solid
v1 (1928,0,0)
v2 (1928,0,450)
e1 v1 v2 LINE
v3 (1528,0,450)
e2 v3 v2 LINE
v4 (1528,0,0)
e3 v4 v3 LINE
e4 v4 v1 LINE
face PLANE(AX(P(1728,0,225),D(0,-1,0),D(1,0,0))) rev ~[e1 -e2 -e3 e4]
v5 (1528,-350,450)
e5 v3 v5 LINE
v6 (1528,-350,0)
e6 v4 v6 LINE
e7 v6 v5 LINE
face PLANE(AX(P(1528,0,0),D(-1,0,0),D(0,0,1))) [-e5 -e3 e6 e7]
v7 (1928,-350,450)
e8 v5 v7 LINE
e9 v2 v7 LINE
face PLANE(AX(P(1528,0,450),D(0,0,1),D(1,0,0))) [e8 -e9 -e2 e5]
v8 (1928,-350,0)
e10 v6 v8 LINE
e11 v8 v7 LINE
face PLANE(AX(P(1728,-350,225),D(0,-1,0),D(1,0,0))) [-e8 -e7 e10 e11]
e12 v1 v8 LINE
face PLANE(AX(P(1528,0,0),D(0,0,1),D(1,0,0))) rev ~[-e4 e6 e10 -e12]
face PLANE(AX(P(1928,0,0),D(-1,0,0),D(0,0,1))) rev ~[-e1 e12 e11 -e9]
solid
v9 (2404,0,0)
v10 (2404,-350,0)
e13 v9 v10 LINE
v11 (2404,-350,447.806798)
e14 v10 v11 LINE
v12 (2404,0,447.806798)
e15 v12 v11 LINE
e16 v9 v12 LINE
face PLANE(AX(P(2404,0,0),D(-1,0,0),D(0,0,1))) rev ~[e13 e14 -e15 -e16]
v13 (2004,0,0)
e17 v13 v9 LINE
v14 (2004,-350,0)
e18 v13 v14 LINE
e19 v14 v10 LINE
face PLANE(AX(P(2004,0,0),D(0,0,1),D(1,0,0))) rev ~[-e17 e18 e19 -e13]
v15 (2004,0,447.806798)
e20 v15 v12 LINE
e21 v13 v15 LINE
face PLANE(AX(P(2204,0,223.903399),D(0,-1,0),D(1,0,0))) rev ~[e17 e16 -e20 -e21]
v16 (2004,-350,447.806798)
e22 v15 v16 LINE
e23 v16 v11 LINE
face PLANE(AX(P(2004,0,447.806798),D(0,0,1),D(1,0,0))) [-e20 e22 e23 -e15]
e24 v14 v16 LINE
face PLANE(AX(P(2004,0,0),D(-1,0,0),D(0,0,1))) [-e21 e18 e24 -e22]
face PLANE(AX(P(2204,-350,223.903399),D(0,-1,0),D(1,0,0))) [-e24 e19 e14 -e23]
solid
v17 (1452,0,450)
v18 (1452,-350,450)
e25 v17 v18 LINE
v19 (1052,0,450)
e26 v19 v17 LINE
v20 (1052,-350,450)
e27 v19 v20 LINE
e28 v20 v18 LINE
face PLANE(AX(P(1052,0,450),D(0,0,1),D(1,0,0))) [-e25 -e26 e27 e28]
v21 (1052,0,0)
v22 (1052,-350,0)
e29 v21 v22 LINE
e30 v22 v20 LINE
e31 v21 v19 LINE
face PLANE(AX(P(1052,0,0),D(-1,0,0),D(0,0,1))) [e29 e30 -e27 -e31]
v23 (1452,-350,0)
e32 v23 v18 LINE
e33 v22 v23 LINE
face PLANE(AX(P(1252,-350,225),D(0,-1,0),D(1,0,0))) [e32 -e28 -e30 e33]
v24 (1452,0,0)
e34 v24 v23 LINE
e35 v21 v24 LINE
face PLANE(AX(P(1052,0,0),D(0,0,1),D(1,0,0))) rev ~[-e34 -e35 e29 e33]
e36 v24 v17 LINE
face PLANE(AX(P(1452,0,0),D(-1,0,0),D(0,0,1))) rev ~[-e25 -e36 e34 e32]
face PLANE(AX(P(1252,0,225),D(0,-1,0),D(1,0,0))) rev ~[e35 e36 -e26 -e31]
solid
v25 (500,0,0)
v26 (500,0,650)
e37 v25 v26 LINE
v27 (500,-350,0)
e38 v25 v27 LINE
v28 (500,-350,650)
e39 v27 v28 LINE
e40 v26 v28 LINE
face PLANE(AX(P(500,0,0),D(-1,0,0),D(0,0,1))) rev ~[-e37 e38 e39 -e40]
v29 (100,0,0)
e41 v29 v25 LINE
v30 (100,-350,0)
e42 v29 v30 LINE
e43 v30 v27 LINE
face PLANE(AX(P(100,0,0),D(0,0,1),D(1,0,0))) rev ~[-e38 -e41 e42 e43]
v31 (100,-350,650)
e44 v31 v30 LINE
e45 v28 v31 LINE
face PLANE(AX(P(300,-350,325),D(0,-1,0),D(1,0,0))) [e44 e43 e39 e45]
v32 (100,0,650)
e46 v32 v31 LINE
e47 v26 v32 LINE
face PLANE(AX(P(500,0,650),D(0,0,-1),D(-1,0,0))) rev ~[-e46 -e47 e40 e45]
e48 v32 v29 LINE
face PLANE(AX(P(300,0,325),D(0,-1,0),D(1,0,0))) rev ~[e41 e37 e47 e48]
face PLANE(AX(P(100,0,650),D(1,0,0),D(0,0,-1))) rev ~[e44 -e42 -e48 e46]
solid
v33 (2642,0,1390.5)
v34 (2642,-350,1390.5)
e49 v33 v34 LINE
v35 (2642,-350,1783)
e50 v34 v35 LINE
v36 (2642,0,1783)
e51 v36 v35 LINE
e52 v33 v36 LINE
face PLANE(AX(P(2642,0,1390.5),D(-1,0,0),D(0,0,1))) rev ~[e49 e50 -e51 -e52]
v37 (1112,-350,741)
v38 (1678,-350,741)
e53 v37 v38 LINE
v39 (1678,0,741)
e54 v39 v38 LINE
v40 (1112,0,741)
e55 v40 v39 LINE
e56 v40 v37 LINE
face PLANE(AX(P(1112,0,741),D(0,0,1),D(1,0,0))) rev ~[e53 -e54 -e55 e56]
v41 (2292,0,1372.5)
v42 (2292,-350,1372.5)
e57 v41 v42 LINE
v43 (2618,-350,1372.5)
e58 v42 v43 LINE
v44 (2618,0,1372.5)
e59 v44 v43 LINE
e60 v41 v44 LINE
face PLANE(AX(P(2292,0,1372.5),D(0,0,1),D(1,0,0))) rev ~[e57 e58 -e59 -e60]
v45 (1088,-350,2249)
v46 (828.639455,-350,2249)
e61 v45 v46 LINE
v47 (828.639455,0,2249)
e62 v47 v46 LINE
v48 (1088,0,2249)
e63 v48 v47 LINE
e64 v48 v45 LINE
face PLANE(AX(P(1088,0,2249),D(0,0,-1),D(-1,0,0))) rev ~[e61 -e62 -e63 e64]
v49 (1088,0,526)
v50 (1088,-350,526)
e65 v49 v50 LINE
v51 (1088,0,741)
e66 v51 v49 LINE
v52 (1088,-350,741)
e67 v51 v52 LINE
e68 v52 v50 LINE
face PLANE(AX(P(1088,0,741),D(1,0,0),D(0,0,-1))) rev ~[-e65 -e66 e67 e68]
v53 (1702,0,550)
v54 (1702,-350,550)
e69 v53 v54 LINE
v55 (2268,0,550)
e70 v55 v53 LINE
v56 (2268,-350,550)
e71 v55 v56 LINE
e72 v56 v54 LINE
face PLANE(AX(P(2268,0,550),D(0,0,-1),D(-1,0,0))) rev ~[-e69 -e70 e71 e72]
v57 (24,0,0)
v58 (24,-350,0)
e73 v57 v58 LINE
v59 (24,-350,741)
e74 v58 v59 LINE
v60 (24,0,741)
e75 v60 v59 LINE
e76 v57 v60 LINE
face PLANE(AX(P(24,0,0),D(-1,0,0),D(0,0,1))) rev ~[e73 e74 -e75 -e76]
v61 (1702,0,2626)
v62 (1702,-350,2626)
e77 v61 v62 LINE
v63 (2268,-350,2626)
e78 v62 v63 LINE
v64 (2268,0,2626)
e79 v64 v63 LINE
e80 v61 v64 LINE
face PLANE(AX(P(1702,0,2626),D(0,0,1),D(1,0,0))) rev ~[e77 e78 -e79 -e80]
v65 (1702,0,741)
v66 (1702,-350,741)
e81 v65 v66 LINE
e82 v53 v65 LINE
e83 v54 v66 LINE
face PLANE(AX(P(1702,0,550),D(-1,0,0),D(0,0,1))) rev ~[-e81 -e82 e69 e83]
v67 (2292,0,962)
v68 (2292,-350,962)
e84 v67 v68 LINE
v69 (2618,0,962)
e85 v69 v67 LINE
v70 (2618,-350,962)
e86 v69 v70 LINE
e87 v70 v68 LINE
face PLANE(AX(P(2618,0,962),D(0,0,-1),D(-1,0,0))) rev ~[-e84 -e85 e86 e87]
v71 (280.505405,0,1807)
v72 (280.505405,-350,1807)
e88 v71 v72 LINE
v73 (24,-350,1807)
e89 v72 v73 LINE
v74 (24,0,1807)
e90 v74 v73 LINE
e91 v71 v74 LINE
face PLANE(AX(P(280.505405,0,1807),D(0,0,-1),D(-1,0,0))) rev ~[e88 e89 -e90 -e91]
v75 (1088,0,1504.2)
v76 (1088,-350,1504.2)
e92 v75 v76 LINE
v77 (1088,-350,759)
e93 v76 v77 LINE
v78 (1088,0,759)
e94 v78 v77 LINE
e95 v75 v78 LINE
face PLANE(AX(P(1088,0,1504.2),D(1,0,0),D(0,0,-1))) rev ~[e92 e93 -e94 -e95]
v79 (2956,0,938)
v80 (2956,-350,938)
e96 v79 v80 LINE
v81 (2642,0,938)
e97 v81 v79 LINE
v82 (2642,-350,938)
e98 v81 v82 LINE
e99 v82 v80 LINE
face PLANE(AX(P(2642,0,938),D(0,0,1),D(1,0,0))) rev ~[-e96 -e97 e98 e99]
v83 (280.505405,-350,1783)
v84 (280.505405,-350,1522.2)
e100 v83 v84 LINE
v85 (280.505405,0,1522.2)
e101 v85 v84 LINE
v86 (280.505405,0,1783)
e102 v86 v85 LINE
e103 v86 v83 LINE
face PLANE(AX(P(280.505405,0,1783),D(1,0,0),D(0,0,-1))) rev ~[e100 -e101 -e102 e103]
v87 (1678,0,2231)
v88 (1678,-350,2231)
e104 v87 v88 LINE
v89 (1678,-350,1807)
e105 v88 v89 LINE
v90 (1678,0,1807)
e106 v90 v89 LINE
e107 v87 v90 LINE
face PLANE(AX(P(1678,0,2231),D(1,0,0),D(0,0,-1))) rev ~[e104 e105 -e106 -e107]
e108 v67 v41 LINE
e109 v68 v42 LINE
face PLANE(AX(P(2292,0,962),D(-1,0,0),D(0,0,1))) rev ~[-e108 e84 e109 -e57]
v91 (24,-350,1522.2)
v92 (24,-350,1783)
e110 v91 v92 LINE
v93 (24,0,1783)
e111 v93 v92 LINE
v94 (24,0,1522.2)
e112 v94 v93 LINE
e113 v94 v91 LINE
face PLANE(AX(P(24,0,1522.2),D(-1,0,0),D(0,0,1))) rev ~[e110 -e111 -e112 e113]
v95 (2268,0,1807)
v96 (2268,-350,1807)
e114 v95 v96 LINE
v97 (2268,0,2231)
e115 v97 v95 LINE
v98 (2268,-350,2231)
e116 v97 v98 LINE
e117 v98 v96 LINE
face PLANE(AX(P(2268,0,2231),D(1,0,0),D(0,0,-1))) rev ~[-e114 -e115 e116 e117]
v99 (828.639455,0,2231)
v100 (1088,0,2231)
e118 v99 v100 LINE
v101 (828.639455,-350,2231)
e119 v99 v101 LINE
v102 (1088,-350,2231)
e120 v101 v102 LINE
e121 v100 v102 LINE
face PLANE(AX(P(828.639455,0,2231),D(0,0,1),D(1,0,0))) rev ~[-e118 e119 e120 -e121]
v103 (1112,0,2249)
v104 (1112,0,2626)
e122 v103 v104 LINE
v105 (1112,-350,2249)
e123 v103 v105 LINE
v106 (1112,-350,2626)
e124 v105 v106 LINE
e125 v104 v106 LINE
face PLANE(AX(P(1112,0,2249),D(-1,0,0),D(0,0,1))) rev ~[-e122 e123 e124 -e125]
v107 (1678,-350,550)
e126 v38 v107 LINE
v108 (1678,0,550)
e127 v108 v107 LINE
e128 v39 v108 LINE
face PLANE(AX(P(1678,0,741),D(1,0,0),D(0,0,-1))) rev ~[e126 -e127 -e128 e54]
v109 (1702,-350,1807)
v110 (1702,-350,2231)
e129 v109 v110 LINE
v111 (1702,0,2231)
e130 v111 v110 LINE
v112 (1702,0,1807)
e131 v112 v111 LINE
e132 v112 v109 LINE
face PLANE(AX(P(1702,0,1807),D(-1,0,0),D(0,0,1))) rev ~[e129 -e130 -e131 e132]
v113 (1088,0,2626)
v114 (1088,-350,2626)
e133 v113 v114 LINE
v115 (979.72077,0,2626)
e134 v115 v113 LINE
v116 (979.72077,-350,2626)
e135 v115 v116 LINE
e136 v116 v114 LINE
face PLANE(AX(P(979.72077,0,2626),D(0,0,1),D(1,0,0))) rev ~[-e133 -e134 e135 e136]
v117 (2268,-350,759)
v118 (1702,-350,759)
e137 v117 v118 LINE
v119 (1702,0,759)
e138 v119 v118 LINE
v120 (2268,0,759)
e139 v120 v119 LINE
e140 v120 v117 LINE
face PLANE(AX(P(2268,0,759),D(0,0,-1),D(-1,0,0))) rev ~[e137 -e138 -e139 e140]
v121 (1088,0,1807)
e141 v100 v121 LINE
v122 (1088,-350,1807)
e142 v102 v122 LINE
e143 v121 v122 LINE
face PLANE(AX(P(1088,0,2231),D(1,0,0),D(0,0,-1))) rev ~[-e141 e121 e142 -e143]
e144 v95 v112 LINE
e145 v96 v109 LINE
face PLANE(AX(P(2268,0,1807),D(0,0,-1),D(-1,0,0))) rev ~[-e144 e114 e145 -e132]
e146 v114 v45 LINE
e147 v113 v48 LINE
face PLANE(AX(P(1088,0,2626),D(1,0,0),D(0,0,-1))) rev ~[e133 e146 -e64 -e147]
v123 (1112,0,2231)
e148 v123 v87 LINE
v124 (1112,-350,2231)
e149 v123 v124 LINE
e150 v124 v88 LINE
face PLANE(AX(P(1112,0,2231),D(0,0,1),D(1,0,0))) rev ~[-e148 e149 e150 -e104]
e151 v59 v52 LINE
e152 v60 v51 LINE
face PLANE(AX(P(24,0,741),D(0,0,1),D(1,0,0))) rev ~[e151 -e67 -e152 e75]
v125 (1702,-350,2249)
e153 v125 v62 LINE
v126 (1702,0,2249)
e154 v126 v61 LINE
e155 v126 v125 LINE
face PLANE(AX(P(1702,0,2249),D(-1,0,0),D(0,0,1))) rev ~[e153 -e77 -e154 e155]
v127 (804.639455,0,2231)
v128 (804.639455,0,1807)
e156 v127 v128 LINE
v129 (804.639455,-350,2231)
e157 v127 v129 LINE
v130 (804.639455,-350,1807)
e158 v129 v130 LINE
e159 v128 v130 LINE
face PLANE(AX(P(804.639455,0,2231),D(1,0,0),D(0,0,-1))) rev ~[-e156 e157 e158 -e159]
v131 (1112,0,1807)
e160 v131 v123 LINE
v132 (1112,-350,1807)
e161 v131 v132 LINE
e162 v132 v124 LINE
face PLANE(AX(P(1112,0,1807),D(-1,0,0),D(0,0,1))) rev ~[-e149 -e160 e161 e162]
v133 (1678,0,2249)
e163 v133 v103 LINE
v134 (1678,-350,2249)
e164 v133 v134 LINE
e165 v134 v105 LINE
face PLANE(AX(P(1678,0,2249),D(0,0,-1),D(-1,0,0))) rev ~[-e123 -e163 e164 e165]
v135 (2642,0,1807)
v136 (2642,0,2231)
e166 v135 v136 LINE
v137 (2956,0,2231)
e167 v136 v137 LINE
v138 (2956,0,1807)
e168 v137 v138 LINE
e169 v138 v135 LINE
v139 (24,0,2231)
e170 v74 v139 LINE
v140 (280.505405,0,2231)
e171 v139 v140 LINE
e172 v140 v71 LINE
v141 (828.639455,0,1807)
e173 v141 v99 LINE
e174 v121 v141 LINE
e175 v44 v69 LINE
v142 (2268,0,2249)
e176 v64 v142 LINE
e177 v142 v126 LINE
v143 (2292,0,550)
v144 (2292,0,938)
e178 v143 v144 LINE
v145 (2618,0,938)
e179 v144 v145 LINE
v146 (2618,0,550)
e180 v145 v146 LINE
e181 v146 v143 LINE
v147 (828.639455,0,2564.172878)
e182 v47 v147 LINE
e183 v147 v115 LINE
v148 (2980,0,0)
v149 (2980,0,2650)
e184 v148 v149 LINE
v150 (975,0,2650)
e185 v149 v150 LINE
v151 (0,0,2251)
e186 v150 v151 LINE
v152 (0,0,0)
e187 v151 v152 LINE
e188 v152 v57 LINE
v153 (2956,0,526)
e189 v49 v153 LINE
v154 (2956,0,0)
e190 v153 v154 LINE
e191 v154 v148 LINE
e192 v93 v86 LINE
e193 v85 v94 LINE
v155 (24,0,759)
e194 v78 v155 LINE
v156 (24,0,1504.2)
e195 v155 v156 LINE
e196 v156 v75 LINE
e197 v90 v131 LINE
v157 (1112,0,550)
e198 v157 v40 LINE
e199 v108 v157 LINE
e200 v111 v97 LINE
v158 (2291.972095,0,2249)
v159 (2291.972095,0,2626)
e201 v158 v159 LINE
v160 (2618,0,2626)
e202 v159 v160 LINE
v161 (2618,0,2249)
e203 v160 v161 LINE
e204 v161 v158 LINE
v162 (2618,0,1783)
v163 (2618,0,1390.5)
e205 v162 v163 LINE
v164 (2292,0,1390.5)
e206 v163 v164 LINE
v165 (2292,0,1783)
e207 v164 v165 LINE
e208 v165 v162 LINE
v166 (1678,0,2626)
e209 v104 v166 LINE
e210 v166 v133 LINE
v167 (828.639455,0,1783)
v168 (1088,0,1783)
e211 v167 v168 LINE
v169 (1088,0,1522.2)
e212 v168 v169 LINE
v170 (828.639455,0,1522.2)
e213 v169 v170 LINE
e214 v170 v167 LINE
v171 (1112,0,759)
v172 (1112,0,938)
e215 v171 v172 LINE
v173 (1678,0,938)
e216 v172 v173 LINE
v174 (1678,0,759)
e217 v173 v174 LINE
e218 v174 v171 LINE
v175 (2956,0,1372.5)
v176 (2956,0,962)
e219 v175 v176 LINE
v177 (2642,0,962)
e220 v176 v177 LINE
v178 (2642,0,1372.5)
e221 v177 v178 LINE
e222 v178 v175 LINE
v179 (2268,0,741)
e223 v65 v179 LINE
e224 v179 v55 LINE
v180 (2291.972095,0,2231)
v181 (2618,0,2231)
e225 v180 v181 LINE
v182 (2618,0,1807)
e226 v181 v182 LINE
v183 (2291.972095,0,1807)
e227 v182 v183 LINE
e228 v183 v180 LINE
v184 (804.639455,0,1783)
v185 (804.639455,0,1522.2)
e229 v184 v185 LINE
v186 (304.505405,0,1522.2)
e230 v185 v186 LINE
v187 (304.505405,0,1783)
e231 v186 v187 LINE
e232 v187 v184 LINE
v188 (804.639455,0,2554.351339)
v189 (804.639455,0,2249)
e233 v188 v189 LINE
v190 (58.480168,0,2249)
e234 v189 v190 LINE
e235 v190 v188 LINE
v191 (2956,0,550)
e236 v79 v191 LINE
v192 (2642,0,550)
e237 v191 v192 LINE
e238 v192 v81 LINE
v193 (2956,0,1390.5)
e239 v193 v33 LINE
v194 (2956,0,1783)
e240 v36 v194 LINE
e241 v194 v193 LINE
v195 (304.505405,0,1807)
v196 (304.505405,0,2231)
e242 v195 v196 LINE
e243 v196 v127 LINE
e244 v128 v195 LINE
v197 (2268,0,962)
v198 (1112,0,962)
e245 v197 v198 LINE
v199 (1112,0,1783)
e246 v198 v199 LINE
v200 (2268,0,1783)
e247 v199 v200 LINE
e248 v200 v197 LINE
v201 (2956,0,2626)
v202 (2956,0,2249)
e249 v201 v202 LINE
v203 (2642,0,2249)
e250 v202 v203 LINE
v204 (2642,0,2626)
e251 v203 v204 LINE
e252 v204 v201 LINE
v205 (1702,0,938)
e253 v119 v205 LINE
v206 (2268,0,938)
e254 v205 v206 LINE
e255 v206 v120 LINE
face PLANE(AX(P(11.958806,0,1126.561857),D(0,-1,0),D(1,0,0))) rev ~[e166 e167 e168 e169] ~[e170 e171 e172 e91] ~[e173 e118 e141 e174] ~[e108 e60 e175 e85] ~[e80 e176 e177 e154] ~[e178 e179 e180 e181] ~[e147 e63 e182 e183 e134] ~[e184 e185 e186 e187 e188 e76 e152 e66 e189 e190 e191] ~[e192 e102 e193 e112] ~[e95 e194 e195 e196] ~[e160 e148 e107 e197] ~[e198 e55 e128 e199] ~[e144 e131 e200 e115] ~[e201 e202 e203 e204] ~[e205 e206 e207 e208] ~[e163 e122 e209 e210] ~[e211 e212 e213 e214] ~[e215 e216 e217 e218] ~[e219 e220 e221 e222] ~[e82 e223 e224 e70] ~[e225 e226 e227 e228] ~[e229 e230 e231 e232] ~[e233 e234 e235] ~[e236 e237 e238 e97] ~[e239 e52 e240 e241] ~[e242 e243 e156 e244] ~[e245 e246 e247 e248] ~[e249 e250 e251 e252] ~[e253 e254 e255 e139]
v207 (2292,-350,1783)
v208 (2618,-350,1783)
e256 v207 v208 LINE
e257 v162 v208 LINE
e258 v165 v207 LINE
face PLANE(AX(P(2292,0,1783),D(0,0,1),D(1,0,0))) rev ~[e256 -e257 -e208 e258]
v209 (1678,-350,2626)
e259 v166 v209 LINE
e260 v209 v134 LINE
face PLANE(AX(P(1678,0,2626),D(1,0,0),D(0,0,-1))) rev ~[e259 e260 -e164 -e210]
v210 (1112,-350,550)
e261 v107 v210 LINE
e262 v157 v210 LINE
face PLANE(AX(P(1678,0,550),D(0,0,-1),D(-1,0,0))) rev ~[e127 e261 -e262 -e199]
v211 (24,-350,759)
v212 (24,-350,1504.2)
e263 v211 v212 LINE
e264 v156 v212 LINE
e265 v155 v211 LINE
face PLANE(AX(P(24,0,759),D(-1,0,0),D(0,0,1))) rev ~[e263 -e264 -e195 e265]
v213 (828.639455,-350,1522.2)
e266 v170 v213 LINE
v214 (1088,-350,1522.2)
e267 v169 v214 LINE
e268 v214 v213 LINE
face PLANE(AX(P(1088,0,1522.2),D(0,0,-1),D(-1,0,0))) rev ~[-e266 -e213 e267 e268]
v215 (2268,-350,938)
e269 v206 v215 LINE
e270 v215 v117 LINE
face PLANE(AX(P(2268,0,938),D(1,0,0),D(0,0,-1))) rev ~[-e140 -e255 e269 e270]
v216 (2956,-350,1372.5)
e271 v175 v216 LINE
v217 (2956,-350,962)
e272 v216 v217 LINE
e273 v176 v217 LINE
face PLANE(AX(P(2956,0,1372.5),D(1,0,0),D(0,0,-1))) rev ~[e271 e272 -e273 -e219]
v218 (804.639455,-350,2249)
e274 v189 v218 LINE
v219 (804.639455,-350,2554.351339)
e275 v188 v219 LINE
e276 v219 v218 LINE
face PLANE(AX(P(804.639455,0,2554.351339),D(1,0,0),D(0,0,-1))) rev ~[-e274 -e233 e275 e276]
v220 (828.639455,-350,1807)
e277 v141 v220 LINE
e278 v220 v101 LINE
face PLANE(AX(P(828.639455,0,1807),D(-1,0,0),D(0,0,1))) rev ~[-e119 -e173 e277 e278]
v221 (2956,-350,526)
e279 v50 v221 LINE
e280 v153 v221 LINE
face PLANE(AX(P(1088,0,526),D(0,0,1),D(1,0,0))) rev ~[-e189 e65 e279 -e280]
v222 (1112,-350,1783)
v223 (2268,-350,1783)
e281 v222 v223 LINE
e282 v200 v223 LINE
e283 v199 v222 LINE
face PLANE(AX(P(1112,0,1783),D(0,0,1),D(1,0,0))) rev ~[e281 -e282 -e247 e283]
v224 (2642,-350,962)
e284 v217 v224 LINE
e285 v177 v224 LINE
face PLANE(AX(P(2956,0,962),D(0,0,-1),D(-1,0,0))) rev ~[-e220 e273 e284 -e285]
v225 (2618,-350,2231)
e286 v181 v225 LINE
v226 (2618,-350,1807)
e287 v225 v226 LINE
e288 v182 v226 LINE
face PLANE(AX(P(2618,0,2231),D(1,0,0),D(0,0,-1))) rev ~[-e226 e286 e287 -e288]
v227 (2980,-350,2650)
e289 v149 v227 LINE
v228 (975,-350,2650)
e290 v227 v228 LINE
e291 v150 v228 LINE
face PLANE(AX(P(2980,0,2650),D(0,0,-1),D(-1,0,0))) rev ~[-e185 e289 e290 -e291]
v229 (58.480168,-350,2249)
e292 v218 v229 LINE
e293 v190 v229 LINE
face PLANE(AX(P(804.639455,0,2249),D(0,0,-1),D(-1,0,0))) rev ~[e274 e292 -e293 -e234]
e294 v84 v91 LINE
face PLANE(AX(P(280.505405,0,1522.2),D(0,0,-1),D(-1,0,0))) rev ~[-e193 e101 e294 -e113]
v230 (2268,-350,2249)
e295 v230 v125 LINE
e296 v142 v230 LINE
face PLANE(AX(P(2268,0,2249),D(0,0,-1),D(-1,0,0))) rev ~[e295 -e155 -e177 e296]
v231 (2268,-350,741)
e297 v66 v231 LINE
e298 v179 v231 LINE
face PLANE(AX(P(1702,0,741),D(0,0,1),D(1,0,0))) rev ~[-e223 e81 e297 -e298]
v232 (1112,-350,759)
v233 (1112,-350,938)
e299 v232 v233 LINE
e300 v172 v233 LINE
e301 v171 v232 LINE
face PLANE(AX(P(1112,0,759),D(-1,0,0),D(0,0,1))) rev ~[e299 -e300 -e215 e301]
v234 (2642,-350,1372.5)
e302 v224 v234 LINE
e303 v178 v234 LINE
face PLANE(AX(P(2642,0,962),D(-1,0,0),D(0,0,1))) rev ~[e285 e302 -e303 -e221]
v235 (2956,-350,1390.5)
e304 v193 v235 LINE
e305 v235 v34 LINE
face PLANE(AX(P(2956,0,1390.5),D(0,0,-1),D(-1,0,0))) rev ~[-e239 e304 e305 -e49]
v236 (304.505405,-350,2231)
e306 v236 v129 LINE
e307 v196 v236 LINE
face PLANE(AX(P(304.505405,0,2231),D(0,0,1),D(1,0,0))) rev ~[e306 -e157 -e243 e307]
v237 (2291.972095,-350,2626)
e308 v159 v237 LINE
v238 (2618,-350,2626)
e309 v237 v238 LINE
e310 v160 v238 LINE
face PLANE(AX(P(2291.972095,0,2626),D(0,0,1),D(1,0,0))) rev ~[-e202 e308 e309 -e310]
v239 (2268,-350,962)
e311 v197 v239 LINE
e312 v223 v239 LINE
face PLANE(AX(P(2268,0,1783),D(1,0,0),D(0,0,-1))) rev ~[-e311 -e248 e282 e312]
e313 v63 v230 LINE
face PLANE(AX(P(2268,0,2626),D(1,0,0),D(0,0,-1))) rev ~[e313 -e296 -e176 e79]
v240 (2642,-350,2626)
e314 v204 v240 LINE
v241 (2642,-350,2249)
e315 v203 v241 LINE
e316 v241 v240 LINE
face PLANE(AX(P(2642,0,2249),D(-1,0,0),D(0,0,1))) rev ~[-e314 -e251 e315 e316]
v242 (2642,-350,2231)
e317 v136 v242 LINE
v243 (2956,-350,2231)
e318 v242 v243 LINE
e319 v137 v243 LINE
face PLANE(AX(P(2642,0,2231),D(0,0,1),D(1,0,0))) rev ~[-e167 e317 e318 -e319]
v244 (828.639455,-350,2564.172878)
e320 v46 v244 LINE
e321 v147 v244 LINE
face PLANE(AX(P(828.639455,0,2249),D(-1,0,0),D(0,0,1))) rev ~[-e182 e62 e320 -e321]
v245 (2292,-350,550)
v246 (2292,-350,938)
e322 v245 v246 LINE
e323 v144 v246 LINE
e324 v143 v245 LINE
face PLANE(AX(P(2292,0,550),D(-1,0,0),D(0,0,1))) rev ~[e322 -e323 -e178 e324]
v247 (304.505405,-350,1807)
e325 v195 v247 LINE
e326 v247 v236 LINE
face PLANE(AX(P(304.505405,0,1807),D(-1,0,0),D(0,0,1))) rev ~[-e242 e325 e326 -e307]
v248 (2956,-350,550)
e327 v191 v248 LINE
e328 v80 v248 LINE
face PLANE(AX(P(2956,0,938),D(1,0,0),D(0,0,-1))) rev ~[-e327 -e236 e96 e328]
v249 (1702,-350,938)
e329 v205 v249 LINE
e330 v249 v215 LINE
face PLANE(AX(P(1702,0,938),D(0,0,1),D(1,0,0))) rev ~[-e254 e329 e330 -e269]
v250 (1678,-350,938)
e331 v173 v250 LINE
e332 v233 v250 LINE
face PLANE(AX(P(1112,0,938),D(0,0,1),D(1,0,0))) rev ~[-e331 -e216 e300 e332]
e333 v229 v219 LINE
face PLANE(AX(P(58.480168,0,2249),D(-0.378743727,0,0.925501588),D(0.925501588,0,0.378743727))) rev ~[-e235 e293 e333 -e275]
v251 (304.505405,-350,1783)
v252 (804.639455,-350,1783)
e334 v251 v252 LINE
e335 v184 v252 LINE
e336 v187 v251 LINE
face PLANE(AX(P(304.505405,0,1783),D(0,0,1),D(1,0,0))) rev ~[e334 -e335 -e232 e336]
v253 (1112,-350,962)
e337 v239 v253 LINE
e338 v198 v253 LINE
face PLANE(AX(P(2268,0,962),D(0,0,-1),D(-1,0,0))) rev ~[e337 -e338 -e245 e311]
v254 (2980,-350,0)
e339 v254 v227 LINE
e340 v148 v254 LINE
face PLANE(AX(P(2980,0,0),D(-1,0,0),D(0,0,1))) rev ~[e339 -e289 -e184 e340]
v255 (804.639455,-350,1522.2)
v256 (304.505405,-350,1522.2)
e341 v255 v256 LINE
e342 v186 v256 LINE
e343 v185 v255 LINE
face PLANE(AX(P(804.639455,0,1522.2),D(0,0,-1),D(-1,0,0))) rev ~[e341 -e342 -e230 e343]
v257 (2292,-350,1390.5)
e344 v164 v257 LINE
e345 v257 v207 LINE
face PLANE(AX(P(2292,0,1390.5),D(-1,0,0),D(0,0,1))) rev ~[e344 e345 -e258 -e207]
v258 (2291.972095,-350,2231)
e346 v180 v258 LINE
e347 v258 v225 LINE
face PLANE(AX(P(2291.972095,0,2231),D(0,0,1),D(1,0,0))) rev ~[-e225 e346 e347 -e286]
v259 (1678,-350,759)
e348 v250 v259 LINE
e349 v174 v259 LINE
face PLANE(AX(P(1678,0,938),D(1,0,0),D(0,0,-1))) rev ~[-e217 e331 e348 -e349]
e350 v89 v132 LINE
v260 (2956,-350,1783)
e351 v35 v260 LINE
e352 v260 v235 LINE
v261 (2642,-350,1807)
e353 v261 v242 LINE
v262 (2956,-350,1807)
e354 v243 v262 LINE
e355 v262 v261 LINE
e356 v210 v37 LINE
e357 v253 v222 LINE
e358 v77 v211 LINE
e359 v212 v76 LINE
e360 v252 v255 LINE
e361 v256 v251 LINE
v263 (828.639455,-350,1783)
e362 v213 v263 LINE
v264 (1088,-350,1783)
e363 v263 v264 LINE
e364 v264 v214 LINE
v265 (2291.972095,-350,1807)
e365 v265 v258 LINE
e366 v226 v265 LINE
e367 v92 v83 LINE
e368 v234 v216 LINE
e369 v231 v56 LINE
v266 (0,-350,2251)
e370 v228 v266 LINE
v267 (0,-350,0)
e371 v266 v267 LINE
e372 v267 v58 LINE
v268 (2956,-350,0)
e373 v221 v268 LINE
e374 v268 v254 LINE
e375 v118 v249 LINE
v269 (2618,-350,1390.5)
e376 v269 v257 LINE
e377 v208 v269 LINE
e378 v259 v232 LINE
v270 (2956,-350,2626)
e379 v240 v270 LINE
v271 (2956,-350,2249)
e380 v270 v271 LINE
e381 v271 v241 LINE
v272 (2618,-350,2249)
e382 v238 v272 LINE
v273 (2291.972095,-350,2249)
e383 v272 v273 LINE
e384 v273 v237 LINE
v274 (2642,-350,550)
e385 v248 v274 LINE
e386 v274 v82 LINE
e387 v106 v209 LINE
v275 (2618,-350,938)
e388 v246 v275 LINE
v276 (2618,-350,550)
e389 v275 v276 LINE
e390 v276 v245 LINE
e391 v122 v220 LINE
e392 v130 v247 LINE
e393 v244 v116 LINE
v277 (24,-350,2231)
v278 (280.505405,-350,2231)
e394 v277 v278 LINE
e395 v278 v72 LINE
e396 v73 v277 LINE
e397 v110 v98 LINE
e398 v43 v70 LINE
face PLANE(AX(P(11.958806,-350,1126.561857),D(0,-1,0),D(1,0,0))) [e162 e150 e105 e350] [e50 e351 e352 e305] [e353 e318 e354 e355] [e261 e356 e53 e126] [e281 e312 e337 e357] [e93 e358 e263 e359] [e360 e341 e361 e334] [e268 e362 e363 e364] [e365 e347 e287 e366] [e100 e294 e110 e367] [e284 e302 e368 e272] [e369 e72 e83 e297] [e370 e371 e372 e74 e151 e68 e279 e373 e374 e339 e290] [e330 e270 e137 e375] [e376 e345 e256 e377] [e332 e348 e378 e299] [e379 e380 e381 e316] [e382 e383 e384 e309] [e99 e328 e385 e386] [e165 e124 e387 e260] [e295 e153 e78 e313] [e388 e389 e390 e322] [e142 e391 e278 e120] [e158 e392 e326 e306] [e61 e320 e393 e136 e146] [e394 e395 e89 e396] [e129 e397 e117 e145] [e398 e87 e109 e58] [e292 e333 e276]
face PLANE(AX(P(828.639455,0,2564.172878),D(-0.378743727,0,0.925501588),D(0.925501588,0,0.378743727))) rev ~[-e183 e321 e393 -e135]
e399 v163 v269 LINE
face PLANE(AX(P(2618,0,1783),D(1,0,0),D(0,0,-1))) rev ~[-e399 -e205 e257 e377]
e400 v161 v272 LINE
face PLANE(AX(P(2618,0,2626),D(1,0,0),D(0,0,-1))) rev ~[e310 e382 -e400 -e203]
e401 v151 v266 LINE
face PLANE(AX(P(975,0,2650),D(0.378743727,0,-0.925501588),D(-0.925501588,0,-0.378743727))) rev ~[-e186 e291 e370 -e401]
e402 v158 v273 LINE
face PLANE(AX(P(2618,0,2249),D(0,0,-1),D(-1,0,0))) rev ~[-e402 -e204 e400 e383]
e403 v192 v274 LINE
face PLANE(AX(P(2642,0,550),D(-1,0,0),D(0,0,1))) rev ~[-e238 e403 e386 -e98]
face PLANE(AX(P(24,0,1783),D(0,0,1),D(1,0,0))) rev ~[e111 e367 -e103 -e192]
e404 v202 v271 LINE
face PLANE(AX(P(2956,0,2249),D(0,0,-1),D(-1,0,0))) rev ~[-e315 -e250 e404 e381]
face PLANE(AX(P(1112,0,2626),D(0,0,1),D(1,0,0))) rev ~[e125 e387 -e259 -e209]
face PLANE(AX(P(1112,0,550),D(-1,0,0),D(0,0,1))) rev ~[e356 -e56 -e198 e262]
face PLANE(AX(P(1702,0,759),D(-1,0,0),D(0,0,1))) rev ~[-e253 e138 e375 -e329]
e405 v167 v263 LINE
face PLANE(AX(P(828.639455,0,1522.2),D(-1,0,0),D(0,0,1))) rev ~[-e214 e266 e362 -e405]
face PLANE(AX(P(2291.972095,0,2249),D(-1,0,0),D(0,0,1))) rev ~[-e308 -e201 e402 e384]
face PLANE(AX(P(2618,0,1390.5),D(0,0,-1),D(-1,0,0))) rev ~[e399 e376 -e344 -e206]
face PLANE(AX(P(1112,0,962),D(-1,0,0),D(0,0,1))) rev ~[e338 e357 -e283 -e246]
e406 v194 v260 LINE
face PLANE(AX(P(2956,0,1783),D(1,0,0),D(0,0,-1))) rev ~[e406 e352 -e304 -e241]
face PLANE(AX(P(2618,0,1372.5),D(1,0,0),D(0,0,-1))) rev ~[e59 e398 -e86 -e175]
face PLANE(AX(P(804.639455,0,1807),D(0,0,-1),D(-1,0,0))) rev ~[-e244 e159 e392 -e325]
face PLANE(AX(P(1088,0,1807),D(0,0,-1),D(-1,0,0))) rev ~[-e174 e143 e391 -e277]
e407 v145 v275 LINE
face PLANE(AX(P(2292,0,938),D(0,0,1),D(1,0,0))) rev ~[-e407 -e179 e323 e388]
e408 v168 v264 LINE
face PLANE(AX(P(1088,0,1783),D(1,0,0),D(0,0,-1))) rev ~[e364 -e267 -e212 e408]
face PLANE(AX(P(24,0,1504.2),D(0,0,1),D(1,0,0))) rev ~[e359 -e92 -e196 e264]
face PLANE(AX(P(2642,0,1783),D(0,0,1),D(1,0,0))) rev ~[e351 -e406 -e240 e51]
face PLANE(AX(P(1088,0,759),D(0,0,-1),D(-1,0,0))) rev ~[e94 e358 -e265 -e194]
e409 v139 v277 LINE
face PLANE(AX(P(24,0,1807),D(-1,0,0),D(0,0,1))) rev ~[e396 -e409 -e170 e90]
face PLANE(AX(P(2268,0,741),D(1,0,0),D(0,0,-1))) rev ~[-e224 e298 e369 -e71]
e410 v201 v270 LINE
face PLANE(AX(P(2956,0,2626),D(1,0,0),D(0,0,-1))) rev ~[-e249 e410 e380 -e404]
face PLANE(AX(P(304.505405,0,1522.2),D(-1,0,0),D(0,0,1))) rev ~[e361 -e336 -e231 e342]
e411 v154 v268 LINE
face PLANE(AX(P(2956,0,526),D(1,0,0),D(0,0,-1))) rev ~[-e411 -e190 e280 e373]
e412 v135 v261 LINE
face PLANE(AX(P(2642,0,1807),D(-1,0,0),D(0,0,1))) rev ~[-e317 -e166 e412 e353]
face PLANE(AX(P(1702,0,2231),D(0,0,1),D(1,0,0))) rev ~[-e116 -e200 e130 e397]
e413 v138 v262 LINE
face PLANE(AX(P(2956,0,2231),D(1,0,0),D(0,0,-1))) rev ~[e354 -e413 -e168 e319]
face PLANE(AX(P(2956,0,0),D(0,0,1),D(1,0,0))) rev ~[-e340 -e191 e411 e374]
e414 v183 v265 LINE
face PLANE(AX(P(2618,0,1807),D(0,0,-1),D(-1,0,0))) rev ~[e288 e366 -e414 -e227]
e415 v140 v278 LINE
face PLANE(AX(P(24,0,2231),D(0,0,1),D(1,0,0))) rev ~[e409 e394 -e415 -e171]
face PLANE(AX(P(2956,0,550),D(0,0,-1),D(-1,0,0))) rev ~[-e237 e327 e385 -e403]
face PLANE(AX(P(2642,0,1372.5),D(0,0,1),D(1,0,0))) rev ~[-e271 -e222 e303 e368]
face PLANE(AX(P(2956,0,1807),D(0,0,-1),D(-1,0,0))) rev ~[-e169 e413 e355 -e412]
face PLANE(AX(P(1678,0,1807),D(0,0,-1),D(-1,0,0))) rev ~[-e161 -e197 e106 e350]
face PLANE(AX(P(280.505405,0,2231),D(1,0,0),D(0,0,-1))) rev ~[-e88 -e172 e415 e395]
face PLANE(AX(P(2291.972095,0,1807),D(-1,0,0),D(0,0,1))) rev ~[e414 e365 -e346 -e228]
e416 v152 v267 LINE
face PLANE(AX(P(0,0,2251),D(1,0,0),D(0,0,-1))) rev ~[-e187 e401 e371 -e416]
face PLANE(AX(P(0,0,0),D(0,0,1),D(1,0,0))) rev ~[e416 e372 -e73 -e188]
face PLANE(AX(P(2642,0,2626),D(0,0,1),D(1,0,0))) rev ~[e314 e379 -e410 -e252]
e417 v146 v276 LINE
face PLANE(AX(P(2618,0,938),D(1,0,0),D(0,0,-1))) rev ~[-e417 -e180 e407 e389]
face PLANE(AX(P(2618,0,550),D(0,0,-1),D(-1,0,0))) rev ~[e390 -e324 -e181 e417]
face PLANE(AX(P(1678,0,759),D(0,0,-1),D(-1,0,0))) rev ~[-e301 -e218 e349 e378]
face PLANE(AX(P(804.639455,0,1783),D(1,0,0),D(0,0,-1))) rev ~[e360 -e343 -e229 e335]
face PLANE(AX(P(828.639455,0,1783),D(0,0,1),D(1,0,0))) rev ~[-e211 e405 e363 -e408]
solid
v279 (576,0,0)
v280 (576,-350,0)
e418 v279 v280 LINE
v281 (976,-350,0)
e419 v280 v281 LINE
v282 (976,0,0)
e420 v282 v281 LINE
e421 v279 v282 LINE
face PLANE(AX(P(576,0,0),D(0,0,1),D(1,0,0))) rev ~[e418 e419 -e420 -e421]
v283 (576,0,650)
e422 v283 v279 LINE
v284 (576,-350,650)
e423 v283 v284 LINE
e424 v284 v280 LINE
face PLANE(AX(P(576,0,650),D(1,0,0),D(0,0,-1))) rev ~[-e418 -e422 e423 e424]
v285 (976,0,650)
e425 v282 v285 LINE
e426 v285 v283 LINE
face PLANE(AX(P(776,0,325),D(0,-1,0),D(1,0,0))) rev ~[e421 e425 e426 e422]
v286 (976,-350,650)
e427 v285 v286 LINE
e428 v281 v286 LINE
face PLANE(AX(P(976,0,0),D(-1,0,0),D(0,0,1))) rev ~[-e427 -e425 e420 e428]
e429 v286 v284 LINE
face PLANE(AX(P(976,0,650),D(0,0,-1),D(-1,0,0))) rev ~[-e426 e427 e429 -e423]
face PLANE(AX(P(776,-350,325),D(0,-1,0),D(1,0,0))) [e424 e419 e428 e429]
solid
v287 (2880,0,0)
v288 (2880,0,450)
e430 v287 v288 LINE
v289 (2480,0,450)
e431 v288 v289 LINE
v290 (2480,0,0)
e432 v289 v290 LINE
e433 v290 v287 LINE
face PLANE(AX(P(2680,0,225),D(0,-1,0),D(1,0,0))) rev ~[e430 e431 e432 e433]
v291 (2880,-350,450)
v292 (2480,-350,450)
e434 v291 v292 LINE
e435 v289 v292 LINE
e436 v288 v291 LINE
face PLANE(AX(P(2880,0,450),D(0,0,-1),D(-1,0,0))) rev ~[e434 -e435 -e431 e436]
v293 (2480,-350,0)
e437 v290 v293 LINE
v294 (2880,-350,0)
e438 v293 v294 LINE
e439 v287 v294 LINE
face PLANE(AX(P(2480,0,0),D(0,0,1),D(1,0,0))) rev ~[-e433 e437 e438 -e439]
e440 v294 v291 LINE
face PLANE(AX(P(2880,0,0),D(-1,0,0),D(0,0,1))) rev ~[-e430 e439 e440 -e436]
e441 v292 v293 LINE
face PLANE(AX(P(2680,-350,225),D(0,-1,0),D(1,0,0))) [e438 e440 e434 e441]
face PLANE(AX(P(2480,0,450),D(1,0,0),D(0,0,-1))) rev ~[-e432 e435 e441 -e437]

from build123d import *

# Parameters (mm, degrees)
F1_DEPTH = 350
F0_W     = 400
F0_H     = 450
F0_H_2   = 447.8067984339


# Not quite as in the source:
# - a feature names something its author has since deleted; it is built from what else it names


with BuildPart() as f1:
    # F0 (on Front) → F1 (new body)
    with BuildSketch(Plane.XZ):
        Polygon((0, 2249), (0, 0), (24, 0), (24, 502), (24, 741), (17, 741), (17, 759), (24, 759), (24, 1504.2), (17, 1504.2), (17, 1522.2), (24, 1522.2), (24, 1783), (17, 1783), (17, 1807), (24, 1807), (24, 2231), (17, 2231), (17, 2249), align=None)
        Polygon((0, 2251), (0, 2249), (17, 2249), (58.4801681387, 2249), (804.639455329, 2554.3513390656), (804.639455329, 2565.1562908123), (828.639455329, 2574.9778292739), (828.639455329, 2564.1728775272), (979.7207696423, 2626), (1088, 2626), (1088, 2636), (1112, 2636), (1112, 2626), (1678, 2626), (1678, 2636), (1702, 2636), (1702, 2626), (2268, 2626), (2268, 2636), (2291.9720954895, 2636), (2291.9720954895, 2626), (2618, 2626), (2618, 2636), (2642, 2636), (2642, 2626), (2956, 2626), (2980, 2650), (975, 2650), align=None)
        Polygon((58.4801681387, 2249), (17, 2249), (17, 2231), (24, 2231), (280.5054049087, 2231), (280.5054049087, 2236.0000610352), (304.5054049087, 2236.0000610352), (304.5054049087, 2231), (804.639455329, 2231), (811.639455329, 2231), (811.639455329, 2249), (804.639455329, 2249), (298.6695170403, 2249), align=None)
        Polygon((17, 741), (24, 741), (1088, 741), (1095, 741), (1095, 759), (1088, 759), (24, 759), (17, 759), align=None)
        Polygon((2980, 0), (2980, 2650), (2956, 2626), (2956, 2249), (2963, 2249), (2963, 2231), (2956, 2231), (2956, 1807), (2963, 1807), (2963, 1783), (2956, 1783), (2956, 1390.5), (2963, 1390.5), (2963, 1372.5), (2956, 1372.5), (2956, 962), (2963, 962), (2963, 938), (2956, 938), (2956, 550), (2963, 550), (2963, 526), (2956, 526), (2956, 502), (2956, 0), align=None)
        Polygon((804.639455329, 2565.1562908123), (804.639455329, 2554.3513390656), (804.639455329, 2249), (811.639455329, 2249), (811.639455329, 2231), (804.639455329, 2231), (804.639455329, 1807), (811.639455329, 1807), (811.639455329, 1783), (804.639455329, 1783), (804.639455329, 1522.2), (804.639455329, 1515.2), (828.639455329, 1515.2), (828.639455329, 1522.2), (828.639455329, 1783), (822.0379948616, 1783), (822.0379948616, 1807), (828.639455329, 1807), (828.639455329, 2231), (822.0379948616, 2231), (822.0379948616, 2249), (828.639455329, 2249), (828.639455329, 2564.1728775272), (828.639455329, 2574.9778292739), align=None)
        Polygon((1095, 741), (1088, 741), (1088, 526), (1112, 550), (1112, 741), (1105, 741), (1105, 759), (1112, 759), (1112, 938), (1105, 938), (1105, 962), (1112, 962), (1112, 1222.6), (1112, 1783), (1105, 1783), (1105, 1807), (1112, 1807), (1112, 2231), (1105, 2231), (1105, 2249), (1112, 2249), (1112, 2626), (1112, 2636), (1088, 2636), (1088, 2626), (1088, 2249), (1095, 2249), (1095, 2231), (1088, 2231), (1088, 1807), (1095, 1807), (1095, 1783), (1088, 1783), (1088, 1522.2), (1095, 1522.2), (1095, 1504.2), (1088, 1504.2), (1088, 1222.6), (1088, 938), (1088, 759), (1095, 759), align=None)
        Polygon((280.5054049087, 2236.0000610352), (280.5054049087, 2231), (280.5054049087, 1807), (287.3089313507, 1807), (287.3089313507, 1783), (280.5054049087, 1783), (280.5054049087, 1522.2), (280.5054049087, 1515.2), (304.5054049087, 1515.2), (304.5054049087, 1522.2), (304.5054049087, 1783), (298.6695170403, 1783), (298.6695170403, 1807), (304.5054049087, 1807), (304.5054049087, 2231), (304.5054049087, 2236.0000610352), align=None)
        Polygon((280.5054049087, 1807), (24, 1807), (17, 1807), (17, 1783), (24, 1783), (280.5054049087, 1783), (287.3089313507, 1783), (287.3089313507, 1807), align=None)
        Polygon((1112, 550), (1088, 526), (2956, 526), (2963, 526), (2963, 550), (2956, 550), (2642, 550), (2642, 540), (2618, 540), (2618, 550), (2292, 550), (2292, 540), (2268, 540), (2268, 550), (1702, 550), (1702, 540), (1678, 540), (1678, 550), align=None)
        Polygon((2642, 2249), (2642, 2626), (2642, 2636), (2618, 2636), (2618, 2626), (2618, 2249), (2625, 2249), (2625, 2231), (2618, 2231), (2618, 1807), (2625, 1807), (2625, 1783), (2618, 1783), (2618, 1390.5), (2625, 1390.5), (2625, 1372.5), (2618, 1372.5), (2618, 962), (2625, 962), (2625, 938), (2618, 938), (2618, 550), (2618, 540), (2642, 540), (2642, 550), (2642, 938), (2635, 938), (2635, 962), (2642, 962), (2642, 1372.5), (2635, 1372.5), (2635, 1390.5), (2642, 1390.5), (2642, 1783), (2635, 1783), (2635, 1807), (2642, 1807), (2642, 2231), (2635, 2231), (2635, 2249), align=None)
        Polygon((2963, 2249), (2956, 2249), (2642, 2249), (2635, 2249), (2635, 2231), (2642, 2231), (2956, 2231), (2963, 2231), align=None)
        Polygon((1678, 741), (1678, 550), (1678, 540), (1702, 540), (1702, 550), (1702, 741), (1695, 741), (1695, 759), (1702, 759), (1702, 938), (1702, 945), (1678, 945), (1678, 938), (1678, 759), (1685, 759), (1685, 741), align=None)
        Polygon((1105, 741), (1112, 741), (1678, 741), (1685, 741), (1685, 759), (1678, 759), (1112, 759), (1105, 759), align=None)
        Polygon((17, 1504.2), (24, 1504.2), (1088, 1504.2), (1095, 1504.2), (1095, 1522.2), (1088, 1522.2), (828.639455329, 1522.2), (828.639455329, 1515.2), (804.639455329, 1515.2), (804.639455329, 1522.2), (304.5054049087, 1522.2), (304.5054049087, 1515.2), (280.5054049087, 1515.2), (280.5054049087, 1522.2), (24, 1522.2), (17, 1522.2), align=None)
        Polygon((1088, 2249), (828.639455329, 2249), (822.0379948616, 2249), (822.0379948616, 2231), (828.639455329, 2231), (1088, 2231), (1095, 2231), (1095, 2249), align=None)
        Polygon((811.639455329, 1807), (804.639455329, 1807), (304.5054049087, 1807), (298.6695170403, 1807), (298.6695170403, 1783), (304.5054049087, 1783), (804.639455329, 1783), (811.639455329, 1783), align=None)
        Polygon((2291.9720954895, 2249), (2291.9720954895, 2626), (2291.9720954895, 2636), (2268, 2636), (2268, 2626), (2268, 2249), (2275, 2249), (2275, 2231), (2268, 2231), (2268, 1807), (2275, 1807), (2275, 1783), (2268, 1783), (2268, 962), (2275, 962), (2275, 938), (2268, 938), (2268, 759), (2275, 759), (2275, 741), (2268, 741), (2268, 550), (2268, 540), (2292, 540), (2292, 550), (2292, 938), (2284.9720954895, 938), (2284.9720954895, 962), (2292, 962), (2292, 1372.5), (2284.9720954895, 1372.5), (2284.9720954895, 1390.5), (2292, 1390.5), (2292, 1783), (2284.9720954895, 1783), (2284.9720954895, 1807), (2291.9720954895, 1807), (2291.9720954895, 2231), (2284.9720954895, 2231), (2284.9720954895, 2249), align=None)
        Polygon((2625, 2249), (2618, 2249), (2291.9720954895, 2249), (2284.9720954895, 2249), (2284.9720954895, 2231), (2291.9720954895, 2231), (2618, 2231), (2625, 2231), align=None)
        Polygon((2963, 1807), (2956, 1807), (2642, 1807), (2635, 1807), (2635, 1783), (2642, 1783), (2818.1127872467, 1783), (2956, 1783), (2963, 1783), align=None)
        Polygon((2642, 938), (2956, 938), (2963, 938), (2963, 962), (2956, 962), (2818.1127872467, 962), (2642, 962), (2635, 962), (2635, 938), align=None)
        Polygon((1695, 741), (1702, 741), (2268, 741), (2275, 741), (2275, 759), (2268, 759), (1702, 759), (1695, 759), align=None)
        Polygon((1105, 938), (1112, 938), (1678, 938), (1678, 945), (1702, 945), (1702, 938), (2268, 938), (2275, 938), (2275, 962), (2268, 962), (1112, 962), (1105, 962), align=None)
        Polygon((1088, 1807), (828.639455329, 1807), (822.0379948616, 1807), (822.0379948616, 1783), (828.639455329, 1783), (1088, 1783), (1095, 1783), (1095, 1807), align=None)
        Polygon((1678, 2636), (1678, 2626), (1678, 2249), (1685, 2249), (1685, 2231), (1678, 2231), (1678, 1807), (1678, 1800), (1702, 1800), (1702, 1807), (1702, 2231), (1695, 2231), (1695, 2249), (1702, 2249), (1702, 2626), (1702, 2636), align=None)
        Polygon((1678, 2249), (1112, 2249), (1105, 2249), (1105, 2231), (1112, 2231), (1678, 2231), (1685, 2231), (1685, 2249), align=None)
        Polygon((2275, 2249), (2268, 2249), (1702, 2249), (1695, 2249), (1695, 2231), (1702, 2231), (2268, 2231), (2275, 2231), align=None)
        Polygon((2625, 1807), (2618, 1807), (2291.9720954895, 1807), (2284.9720954895, 1807), (2284.9720954895, 1783), (2292, 1783), (2618, 1783), (2625, 1783), align=None)
        Polygon((2963, 1390.5), (2956, 1390.5), (2642, 1390.5), (2635, 1390.5), (2635, 1372.5), (2642, 1372.5), (2956, 1372.5), (2963, 1372.5), align=None)
        Polygon((2292, 938), (2618, 938), (2625, 938), (2625, 962), (2618, 962), (2292, 962), (2284.9720954895, 962), (2284.9720954895, 938), align=None)
        Polygon((1112, 1783), (2268, 1783), (2275, 1783), (2275, 1807), (2268, 1807), (1702, 1807), (1702, 1800), (1678, 1800), (1678, 1807), (1112, 1807), (1105, 1807), (1105, 1783), align=None)
        Polygon((2625, 1390.5), (2618, 1390.5), (2292, 1390.5), (2284.9720954895, 1390.5), (2284.9720954895, 1372.5), (2292, 1372.5), (2618, 1372.5), (2625, 1372.5), align=None)
    extrude(amount=F1_DEPTH)


with BuildPart() as f1b:
    # F0 (on Front) → F1, piece 2 (new body)
    with BuildSketch(Plane.XZ):
        Polygon((100, 450), (100, 0), (500, 0), (500, 450), (500, 650), (100, 650), align=None)
    extrude(amount=F1_DEPTH)


with BuildPart() as f1c:
    # F0 (on Front) → F1, piece 3 (new body)
    with BuildSketch(Plane.XZ):
        Polygon((576, 450), (576, 0), (976, 0), (976, 450), (976, 650), (576, 650), align=None)
    extrude(amount=F1_DEPTH)


with BuildPart() as f1d:
    # F0 (on Front) → F1, piece 4 (new body)
    with BuildSketch(Plane.XZ):
        with Locations((1252, 225)):
            Rectangle(F0_W, F0_H)
    extrude(amount=F1_DEPTH)


with BuildPart() as f1e:
    # F0 (on Front) → F1, piece 5 (new body)
    with BuildSketch(Plane.XZ):
        Polygon((2850, 0), (2880, 0), (2880, 450), (2480, 450), (2480, 0), align=None)
    extrude(amount=F1_DEPTH)


with BuildPart() as f1f:
    # F0 (on Front) → F1, piece 6 (new body)
    with BuildSketch(Plane.XZ):
        with Locations((1728, 225)):
            Rectangle(F0_W, F0_H)
    extrude(amount=F1_DEPTH)


with BuildPart() as f1g:
    # F0 (on Front) → F1, piece 7 (new body)
    with BuildSketch(Plane.XZ):
        with Locations((2204, 223.9033992169)):
            Rectangle(F0_W, F0_H_2)
    extrude(amount=F1_DEPTH)


solid = Compound([f1.part, f1b.part, f1c.part, f1d.part, f1e.part, f1f.part, f1g.part])
